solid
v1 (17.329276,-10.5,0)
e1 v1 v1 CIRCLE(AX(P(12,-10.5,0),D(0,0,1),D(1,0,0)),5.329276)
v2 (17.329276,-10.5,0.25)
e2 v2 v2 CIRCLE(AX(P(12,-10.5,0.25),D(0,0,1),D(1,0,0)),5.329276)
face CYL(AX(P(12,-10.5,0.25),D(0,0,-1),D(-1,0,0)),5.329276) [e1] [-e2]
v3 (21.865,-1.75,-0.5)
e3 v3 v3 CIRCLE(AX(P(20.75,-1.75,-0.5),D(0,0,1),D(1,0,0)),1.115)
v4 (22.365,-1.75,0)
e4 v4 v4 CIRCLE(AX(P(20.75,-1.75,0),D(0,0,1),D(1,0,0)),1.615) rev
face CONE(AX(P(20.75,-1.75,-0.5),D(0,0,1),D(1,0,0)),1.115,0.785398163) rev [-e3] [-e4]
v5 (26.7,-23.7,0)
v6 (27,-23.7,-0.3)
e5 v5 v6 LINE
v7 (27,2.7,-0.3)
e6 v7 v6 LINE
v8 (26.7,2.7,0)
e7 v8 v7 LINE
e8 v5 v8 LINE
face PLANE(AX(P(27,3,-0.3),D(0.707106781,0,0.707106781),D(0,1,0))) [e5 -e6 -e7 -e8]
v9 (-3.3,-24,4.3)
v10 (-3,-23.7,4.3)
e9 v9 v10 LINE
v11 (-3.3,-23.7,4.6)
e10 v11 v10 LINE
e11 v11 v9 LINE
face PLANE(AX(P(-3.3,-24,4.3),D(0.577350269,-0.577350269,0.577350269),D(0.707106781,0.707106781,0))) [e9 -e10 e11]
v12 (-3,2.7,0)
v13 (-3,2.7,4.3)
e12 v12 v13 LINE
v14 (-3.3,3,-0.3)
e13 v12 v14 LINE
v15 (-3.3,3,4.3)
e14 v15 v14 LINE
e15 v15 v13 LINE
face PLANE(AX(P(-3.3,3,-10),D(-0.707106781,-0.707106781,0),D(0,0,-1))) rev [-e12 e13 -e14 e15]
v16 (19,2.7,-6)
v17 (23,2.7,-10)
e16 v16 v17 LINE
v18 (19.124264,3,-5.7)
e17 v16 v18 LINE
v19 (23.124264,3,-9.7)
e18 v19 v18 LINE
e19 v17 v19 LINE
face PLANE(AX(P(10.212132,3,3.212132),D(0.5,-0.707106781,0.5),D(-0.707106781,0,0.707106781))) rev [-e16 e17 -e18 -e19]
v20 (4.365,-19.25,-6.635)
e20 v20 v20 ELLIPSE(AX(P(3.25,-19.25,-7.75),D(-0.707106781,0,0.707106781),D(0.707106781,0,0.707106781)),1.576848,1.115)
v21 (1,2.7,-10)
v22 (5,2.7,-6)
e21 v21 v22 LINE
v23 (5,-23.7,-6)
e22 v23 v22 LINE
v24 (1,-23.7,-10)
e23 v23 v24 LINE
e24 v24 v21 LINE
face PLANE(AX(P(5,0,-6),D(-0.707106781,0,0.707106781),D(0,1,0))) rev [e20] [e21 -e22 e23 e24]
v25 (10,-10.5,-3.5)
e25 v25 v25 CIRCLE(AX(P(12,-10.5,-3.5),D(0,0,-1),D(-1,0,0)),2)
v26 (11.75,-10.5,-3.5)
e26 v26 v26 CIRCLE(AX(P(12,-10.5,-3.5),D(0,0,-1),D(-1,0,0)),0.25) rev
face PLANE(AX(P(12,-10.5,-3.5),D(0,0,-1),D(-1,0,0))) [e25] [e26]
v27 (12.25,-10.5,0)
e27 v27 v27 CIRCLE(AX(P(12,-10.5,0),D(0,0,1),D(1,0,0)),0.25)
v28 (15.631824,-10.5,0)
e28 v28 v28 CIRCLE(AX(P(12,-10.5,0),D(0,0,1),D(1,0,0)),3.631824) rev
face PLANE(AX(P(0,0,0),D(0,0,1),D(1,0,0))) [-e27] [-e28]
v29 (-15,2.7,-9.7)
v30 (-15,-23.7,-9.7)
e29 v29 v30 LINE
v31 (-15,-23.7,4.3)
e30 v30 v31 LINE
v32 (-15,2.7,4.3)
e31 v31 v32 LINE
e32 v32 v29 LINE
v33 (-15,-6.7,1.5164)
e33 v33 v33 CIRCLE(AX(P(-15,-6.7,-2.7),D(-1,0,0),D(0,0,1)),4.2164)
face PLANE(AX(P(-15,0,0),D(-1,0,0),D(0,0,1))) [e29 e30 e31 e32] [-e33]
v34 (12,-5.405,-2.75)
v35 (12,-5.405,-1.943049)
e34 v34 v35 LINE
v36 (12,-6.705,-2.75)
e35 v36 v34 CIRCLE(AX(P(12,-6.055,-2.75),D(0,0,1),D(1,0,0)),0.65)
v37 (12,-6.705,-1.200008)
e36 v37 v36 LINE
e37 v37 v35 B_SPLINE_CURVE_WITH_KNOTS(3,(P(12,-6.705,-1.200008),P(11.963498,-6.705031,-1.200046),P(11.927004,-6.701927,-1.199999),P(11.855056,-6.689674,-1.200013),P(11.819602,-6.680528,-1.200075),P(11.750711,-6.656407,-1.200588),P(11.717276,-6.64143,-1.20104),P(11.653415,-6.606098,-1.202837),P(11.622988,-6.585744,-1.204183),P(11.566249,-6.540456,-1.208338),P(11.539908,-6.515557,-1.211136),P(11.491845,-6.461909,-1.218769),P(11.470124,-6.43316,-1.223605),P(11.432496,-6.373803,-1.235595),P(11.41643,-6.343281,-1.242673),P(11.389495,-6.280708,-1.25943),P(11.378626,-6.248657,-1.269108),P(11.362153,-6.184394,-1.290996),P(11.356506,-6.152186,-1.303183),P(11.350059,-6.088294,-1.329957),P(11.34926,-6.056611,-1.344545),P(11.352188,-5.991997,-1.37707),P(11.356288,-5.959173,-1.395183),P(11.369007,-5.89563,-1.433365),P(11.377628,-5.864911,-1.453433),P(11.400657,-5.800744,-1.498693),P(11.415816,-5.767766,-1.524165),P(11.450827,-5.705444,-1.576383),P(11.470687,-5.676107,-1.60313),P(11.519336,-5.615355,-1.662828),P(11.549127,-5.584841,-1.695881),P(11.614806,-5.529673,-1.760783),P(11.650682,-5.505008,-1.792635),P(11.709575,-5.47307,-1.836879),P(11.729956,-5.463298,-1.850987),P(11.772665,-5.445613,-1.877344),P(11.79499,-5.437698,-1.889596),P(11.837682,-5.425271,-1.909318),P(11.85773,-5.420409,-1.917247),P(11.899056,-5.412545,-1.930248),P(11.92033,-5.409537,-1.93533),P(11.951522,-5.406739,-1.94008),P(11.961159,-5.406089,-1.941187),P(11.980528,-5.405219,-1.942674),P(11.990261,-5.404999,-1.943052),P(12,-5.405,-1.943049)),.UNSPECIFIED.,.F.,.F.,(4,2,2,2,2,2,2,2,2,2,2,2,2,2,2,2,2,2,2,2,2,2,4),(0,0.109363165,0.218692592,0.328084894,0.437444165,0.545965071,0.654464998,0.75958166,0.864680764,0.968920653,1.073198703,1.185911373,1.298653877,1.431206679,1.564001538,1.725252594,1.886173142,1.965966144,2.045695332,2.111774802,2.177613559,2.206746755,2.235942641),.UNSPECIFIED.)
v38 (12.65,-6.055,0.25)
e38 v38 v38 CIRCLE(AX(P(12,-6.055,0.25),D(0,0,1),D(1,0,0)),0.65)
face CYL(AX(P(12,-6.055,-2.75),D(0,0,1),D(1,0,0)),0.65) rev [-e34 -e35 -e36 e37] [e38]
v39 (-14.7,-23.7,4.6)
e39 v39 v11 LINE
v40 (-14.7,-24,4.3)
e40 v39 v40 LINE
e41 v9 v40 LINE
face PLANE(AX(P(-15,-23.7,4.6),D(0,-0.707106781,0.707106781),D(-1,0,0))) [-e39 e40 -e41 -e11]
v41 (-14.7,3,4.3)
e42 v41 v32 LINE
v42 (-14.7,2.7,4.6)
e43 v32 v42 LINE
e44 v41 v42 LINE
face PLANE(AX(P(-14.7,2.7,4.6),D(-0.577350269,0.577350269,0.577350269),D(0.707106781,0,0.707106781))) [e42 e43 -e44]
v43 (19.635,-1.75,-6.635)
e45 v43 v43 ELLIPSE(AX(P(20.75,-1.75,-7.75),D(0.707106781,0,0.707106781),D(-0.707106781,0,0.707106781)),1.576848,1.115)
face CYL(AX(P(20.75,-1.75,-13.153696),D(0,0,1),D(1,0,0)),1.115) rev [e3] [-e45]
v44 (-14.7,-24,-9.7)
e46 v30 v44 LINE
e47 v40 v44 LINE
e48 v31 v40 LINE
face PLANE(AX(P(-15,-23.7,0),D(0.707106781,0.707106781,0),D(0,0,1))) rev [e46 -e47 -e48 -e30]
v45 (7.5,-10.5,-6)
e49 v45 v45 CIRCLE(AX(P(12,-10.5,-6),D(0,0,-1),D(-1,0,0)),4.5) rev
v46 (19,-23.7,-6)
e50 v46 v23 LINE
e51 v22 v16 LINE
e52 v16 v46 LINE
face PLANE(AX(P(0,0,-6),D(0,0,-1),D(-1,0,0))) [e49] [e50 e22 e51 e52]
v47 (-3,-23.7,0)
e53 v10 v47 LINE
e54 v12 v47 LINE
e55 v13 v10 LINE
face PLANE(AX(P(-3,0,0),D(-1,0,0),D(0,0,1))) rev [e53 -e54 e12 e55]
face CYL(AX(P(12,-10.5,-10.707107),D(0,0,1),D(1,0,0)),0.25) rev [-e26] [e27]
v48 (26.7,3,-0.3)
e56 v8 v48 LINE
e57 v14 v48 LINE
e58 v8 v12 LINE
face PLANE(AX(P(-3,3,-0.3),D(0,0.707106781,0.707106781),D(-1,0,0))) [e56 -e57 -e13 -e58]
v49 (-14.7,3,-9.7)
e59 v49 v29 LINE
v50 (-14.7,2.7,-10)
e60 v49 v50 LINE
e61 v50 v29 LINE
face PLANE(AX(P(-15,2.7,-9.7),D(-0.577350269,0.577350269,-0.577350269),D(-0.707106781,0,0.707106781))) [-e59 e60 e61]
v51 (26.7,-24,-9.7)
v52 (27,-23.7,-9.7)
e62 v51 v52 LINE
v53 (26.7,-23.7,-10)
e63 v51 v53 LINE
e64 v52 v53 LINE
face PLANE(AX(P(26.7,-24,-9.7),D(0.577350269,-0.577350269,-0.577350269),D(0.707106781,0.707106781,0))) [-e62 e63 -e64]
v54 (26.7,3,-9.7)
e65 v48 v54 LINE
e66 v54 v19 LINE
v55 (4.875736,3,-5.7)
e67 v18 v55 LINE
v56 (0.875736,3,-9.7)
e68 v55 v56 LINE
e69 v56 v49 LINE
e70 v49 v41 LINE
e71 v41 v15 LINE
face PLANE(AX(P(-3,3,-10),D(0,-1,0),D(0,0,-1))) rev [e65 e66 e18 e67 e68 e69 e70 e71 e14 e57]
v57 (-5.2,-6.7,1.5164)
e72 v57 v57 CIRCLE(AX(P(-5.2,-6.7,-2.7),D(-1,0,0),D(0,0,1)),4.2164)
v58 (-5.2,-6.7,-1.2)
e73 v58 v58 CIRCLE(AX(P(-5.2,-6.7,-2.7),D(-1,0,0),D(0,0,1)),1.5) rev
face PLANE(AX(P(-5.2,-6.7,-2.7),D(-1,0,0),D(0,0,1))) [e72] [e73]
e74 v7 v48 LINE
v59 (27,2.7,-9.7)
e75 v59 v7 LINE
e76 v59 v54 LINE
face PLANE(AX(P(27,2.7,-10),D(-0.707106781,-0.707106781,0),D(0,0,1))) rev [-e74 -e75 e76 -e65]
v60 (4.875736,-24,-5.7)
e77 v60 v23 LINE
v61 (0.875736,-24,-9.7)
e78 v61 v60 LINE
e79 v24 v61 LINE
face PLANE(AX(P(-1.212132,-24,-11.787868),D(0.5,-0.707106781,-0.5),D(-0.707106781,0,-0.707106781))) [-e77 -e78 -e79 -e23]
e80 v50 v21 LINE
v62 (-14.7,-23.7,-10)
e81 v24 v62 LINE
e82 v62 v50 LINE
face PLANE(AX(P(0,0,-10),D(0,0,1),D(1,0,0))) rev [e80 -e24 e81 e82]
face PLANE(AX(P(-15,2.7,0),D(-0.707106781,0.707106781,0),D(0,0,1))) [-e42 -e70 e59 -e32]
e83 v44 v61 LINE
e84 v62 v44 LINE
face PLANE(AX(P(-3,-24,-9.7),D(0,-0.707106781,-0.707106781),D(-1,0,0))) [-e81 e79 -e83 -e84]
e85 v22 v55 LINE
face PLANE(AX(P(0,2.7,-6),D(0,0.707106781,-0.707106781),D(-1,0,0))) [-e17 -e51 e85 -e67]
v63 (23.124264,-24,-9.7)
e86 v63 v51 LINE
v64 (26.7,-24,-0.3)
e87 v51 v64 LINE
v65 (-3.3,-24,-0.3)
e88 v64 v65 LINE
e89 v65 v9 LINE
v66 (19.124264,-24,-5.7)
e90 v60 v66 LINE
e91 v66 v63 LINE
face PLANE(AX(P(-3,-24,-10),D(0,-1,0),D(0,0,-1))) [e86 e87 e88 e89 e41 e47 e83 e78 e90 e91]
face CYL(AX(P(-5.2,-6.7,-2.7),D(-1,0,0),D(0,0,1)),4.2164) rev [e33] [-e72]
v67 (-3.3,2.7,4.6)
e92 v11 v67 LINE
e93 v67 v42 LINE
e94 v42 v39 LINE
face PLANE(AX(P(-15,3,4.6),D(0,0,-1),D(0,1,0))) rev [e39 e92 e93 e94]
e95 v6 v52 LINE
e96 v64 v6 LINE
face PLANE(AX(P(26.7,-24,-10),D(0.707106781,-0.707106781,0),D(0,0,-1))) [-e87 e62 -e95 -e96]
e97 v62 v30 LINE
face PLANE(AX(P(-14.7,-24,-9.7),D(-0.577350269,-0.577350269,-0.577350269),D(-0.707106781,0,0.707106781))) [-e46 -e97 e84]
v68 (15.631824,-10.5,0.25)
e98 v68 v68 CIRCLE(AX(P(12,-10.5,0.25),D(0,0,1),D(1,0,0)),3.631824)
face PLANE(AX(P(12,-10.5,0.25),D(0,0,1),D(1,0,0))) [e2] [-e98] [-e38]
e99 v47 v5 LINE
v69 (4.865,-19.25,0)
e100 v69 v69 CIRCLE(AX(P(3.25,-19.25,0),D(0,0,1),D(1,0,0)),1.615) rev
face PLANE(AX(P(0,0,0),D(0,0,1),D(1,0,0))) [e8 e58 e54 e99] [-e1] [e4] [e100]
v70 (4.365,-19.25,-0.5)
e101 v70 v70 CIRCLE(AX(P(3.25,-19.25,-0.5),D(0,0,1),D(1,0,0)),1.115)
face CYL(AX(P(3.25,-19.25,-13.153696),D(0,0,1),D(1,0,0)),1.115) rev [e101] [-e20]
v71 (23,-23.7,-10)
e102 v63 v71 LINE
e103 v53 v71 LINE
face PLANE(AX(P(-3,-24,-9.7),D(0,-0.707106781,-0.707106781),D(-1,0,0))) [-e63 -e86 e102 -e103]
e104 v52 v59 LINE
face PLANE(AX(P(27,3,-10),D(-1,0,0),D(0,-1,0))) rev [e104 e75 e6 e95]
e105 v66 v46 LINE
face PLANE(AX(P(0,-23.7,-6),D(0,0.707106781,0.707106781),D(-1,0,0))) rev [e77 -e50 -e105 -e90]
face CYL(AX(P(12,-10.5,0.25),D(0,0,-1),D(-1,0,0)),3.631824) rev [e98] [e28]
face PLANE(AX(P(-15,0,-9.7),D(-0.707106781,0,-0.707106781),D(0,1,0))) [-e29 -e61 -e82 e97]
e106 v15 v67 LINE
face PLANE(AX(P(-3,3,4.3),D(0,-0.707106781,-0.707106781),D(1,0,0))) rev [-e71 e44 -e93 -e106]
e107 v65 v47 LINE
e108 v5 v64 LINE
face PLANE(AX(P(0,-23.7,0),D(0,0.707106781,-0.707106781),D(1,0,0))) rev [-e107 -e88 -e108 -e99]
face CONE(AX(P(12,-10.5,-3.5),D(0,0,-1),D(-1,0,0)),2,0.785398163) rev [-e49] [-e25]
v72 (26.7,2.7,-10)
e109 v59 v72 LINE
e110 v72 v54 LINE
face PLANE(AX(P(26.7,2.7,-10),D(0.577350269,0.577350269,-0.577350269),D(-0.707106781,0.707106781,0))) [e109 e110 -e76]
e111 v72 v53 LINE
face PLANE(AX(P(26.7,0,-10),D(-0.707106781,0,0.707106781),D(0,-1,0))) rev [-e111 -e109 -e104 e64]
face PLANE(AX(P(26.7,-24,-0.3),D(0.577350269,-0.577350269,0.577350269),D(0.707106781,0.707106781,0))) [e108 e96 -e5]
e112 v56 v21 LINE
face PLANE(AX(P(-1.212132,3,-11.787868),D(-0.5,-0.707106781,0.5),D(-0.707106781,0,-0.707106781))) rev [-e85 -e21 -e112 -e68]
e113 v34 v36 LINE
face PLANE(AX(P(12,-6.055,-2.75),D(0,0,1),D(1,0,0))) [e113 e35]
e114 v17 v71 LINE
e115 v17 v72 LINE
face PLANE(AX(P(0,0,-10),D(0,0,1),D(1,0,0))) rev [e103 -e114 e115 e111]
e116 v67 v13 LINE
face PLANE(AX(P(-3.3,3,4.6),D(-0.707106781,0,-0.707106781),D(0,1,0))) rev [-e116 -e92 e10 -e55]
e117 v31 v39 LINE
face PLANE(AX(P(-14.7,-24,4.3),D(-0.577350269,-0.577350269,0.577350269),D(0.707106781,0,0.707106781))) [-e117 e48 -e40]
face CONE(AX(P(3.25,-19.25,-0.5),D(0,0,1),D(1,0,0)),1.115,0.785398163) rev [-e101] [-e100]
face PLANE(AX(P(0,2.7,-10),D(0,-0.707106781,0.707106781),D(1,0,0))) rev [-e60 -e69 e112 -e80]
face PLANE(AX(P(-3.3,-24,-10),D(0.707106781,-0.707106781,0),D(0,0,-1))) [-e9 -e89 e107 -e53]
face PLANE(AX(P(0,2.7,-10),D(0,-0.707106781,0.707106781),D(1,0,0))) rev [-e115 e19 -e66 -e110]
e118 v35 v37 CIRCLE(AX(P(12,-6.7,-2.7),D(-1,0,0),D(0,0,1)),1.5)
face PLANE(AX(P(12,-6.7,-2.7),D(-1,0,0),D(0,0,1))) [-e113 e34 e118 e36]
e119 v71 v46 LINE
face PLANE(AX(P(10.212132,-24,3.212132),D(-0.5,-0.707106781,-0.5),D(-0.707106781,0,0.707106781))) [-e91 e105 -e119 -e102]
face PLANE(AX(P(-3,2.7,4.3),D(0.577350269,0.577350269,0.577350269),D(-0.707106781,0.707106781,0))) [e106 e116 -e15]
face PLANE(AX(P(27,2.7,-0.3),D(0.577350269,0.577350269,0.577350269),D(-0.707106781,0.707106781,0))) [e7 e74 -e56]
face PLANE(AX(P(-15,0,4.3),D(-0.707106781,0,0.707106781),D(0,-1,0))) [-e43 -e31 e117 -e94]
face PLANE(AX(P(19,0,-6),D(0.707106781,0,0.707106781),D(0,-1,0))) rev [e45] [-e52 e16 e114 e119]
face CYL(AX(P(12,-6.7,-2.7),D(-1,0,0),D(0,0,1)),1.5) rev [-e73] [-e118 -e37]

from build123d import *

# Parameters (mm, degrees)
SKETCH1_W               = 30
SKETCH1_H               = 27
BOSS_EXTRUDE1_DEPTH     = 10
SKETCH2_R               = 1.115
CUT_EXTRUDE1_DEPTH      = 10
SKETCH2_4_R             = 5.329276436
SKETCH2_4_R_2           = 3.631824093
BOSS_EXTRUDE2_DEPTH     = 0.25
SKETCH2_5_R             = 0.25
CUT_EXTRUDE2_DEPTH      = 10
SKETCH4_R               = 0.65
CUT_EXTRUDE3_DEPTH      = 3
SKETCH5_W               = 14.6
SKETCH5_H               = 27
BOSS_EXTRUDE3_DEPTH     = 12
CUT_EXTRUDE4_DEPTH      = 12
CUT_EXTRUDE4_DEPTH_BACK = 15
SKETCH3_R               = 1.5
SKETCH7_R               = 4.2164
CUT_EXTRUDE5_DEPTH      = 9.8
SKETCH8_W               = 22
SKETCH8_H               = 27
CUT_EXTRUDE6_DEPTH      = 4
CHAMFER1_SIZE           = 4
SKETCH9_R               = 2
CUT_EXTRUDE7_DEPTH      = 2.5
CHAMFER2_SIZE           = 2.5
CHAMFER3_SIZE           = 0.3
CHAMFER4_SIZE           = 0.5


# Some blends are built 0.0001 mm under size
with BuildPart() as part:
    # Sketch1 → Boss-Extrude1 (new body)
    with BuildSketch(Plane.XY):
        with Locations((12, -10.5)):
            Rectangle(SKETCH1_W, SKETCH1_H)
    extrude(amount=-BOSS_EXTRUDE1_DEPTH)

    # Sketch2 → Cut-Extrude1 (cut)
    with BuildSketch(Plane.XY):
        with Locations((20.75, -1.75)):
            Circle(SKETCH2_R)
        with Locations((3.25, -19.25)):
            Circle(SKETCH2_R)
    extrude(amount=-CUT_EXTRUDE1_DEPTH, mode=Mode.SUBTRACT)

    # Sketch2<4> → Boss-Extrude2 (add)
    with BuildSketch(Plane.XY):
        with Locations((12, -10.5)):
            Circle(SKETCH2_4_R)
        with Locations((12, -10.5)):
            Circle(SKETCH2_4_R_2, mode=Mode.SUBTRACT)
    extrude(amount=BOSS_EXTRUDE2_DEPTH)

    # Sketch2<5> → Cut-Extrude2 (cut)
    with BuildSketch(Plane.XY):
        with Locations((12, -10.5)):
            Circle(SKETCH2_5_R)
    extrude(amount=-CUT_EXTRUDE2_DEPTH, mode=Mode.SUBTRACT)

    # Sketch4 → Cut-Extrude3 (cut)
    with BuildSketch(Plane.XY.offset(0.25)):
        with Locations((12, -6.055)):
            Circle(SKETCH4_R)
    extrude(amount=-CUT_EXTRUDE3_DEPTH, mode=Mode.SUBTRACT)

    # Sketch5 → Boss-Extrude3 (add)
    with BuildSketch(Plane.ZY.offset(3)):
        with Locations((-2.7, -10.5)):
            Rectangle(SKETCH5_W, SKETCH5_H)
    extrude(amount=BOSS_EXTRUDE3_DEPTH)

    # Sketch3 → Cut-Extrude4 (cut, two sides: drawn at the far end of the back side and taken through both)
    with BuildSketch(Plane.ZY.offset(3).offset(-CUT_EXTRUDE4_DEPTH_BACK)):
        with Locations((-2.7, -6.7)):
            Circle(SKETCH3_R)
    extrude(amount=CUT_EXTRUDE4_DEPTH + CUT_EXTRUDE4_DEPTH_BACK, mode=Mode.SUBTRACT)

    # Sketch7 → Cut-Extrude5 (cut)
    with BuildSketch(Plane.ZY.offset(15)):
        with Locations((-2.7, -6.7)):
            Circle(SKETCH7_R)
    extrude(amount=-CUT_EXTRUDE5_DEPTH, mode=Mode.SUBTRACT)

    # Sketch8 → Cut-Extrude6 (cut)
    with BuildSketch(Plane(origin=(0, 0, -10), x_dir=(-1, 0, 0), z_dir=(0, 0, -1))):
        with Locations((-12, -10.5)):
            Rectangle(SKETCH8_W, SKETCH8_H)
    extrude(amount=-CUT_EXTRUDE6_DEPTH, mode=Mode.SUBTRACT)

    # Chamfer1
    # the kernel refuses this chamfer: 4 mm, written as the material it adds along each edge
    with BuildSketch(Plane(origin=(1, 3, -6), x_dir=(0.9996219169112968, 0, 0.027495876610586275), z_dir=(0, -1, 0))) as chamfer1_piece_1_section:
        Polygon((CHAMFER1_SIZE * 0.999621916911, -CHAMFER1_SIZE * 0.0274958766106), (-CHAMFER1_SIZE * 0.0274958766106, -CHAMFER1_SIZE * 0.999621916911), (0, 0), align=None)
    chamfer1_piece_1 = extrude(amount=27, mode=Mode.PRIVATE)
    chamfer1_piece_1 = chamfer1_piece_1 - Plane(origin=(3.25, -19.25, -7.327035159), x_dir=(1, 0, 0), z_dir=(0, 0, 1)) * Cylinder(1.115, 70, mode=Mode.PRIVATE)
    chamfer1_piece_1 = split(chamfer1_piece_1, bisect_by=Plane(origin=(2.297726003, -10.22672805, -10), z_dir=(0, 0, 1)), keep=Keep.TOP, mode=Mode.PRIVATE)
    add(chamfer1_piece_1)
    with BuildSketch(Plane(origin=(23, -24, -6), x_dir=(0.027495876610586494, 0, -0.9996219169112968), z_dir=(0, 1, 0))) as chamfer1_piece_2_section:
        Polygon((CHAMFER1_SIZE * 0.999621916911, CHAMFER1_SIZE * 0.0274958766106), (-CHAMFER1_SIZE * 0.0274958766106, CHAMFER1_SIZE * 0.999621916911), (0, 0), align=None)
    chamfer1_piece_2 = extrude(amount=27, mode=Mode.PRIVATE)
    chamfer1_piece_2 = split(chamfer1_piece_2, bisect_by=Plane(origin=(21.702275046, -10.773273502, -10), z_dir=(0, 0, 1)), keep=Keep.TOP, mode=Mode.PRIVATE)
    chamfer1_piece_2 = chamfer1_piece_2 - Plane(origin=(20.75, -1.75, -7.327035315), x_dir=(1, 0, 0), z_dir=(0, 0, 1)) * Cylinder(1.115, 70, mode=Mode.PRIVATE)
    add(chamfer1_piece_2)

    # Sketch9 → Cut-Extrude7 (cut)
    with BuildSketch(Plane(origin=(0, 0, -6), x_dir=(-1, 0, 0), z_dir=(0, 0, -1))):
        with Locations((-12, -10.5)):
            Circle(SKETCH9_R)
    extrude(amount=-CUT_EXTRUDE7_DEPTH, mode=Mode.SUBTRACT)

    # Chamfer2
    chamfer2_edges = [part.edges().sort_by_distance(p)[0] for p in [
        (14, -10.5, -6),
    ]]
    chamfer(chamfer2_edges, length=CHAMFER2_SIZE - 0.0001)  # a hair under: the kernel refuses the full size

    # Chamfer3
    chamfer3_edges = [part.edges().sort_by_distance(p)[0] for p in [
        (3, -24, -8),
        (27, -10.5, -10),
        (-7, 3, -10),
        (-3, -24, 2.3),
        (-3, -10.5, 4.6),
        (-9, -24, 4.6),
        (-3, 3, 2.3),
        (-9, 3, 4.6),
        (-15, -10.5, -10),
        (-15, -24, -2.7),
        (-15, -10.5, 4.6),
        (-15, 3, -2.7),
        (12, 3, 0),
        (27, -10.5, 0),
        (12, -24, 0),
        (25, -24, -10),
        (25, 3, -10),
        (27, 3, -5),
        (27, -24, -5),
        (-7, -24, -10),
        (12, -24, -6),
        (12, 3, -6),
        (21, -24, -8),
        (21, 3, -8),
        (3, 3, -8),
    ]]
    chamfer(chamfer3_edges, length=CHAMFER3_SIZE)

    # Chamfer4
    chamfer4_edges = [part.edges().sort_by_distance(p)[0] for p in [
        (2.135, -19.25, 0),
        (19.635, -1.75, 0),
    ]]
    chamfer(chamfer4_edges, length=CHAMFER4_SIZE)


solid = part.part
